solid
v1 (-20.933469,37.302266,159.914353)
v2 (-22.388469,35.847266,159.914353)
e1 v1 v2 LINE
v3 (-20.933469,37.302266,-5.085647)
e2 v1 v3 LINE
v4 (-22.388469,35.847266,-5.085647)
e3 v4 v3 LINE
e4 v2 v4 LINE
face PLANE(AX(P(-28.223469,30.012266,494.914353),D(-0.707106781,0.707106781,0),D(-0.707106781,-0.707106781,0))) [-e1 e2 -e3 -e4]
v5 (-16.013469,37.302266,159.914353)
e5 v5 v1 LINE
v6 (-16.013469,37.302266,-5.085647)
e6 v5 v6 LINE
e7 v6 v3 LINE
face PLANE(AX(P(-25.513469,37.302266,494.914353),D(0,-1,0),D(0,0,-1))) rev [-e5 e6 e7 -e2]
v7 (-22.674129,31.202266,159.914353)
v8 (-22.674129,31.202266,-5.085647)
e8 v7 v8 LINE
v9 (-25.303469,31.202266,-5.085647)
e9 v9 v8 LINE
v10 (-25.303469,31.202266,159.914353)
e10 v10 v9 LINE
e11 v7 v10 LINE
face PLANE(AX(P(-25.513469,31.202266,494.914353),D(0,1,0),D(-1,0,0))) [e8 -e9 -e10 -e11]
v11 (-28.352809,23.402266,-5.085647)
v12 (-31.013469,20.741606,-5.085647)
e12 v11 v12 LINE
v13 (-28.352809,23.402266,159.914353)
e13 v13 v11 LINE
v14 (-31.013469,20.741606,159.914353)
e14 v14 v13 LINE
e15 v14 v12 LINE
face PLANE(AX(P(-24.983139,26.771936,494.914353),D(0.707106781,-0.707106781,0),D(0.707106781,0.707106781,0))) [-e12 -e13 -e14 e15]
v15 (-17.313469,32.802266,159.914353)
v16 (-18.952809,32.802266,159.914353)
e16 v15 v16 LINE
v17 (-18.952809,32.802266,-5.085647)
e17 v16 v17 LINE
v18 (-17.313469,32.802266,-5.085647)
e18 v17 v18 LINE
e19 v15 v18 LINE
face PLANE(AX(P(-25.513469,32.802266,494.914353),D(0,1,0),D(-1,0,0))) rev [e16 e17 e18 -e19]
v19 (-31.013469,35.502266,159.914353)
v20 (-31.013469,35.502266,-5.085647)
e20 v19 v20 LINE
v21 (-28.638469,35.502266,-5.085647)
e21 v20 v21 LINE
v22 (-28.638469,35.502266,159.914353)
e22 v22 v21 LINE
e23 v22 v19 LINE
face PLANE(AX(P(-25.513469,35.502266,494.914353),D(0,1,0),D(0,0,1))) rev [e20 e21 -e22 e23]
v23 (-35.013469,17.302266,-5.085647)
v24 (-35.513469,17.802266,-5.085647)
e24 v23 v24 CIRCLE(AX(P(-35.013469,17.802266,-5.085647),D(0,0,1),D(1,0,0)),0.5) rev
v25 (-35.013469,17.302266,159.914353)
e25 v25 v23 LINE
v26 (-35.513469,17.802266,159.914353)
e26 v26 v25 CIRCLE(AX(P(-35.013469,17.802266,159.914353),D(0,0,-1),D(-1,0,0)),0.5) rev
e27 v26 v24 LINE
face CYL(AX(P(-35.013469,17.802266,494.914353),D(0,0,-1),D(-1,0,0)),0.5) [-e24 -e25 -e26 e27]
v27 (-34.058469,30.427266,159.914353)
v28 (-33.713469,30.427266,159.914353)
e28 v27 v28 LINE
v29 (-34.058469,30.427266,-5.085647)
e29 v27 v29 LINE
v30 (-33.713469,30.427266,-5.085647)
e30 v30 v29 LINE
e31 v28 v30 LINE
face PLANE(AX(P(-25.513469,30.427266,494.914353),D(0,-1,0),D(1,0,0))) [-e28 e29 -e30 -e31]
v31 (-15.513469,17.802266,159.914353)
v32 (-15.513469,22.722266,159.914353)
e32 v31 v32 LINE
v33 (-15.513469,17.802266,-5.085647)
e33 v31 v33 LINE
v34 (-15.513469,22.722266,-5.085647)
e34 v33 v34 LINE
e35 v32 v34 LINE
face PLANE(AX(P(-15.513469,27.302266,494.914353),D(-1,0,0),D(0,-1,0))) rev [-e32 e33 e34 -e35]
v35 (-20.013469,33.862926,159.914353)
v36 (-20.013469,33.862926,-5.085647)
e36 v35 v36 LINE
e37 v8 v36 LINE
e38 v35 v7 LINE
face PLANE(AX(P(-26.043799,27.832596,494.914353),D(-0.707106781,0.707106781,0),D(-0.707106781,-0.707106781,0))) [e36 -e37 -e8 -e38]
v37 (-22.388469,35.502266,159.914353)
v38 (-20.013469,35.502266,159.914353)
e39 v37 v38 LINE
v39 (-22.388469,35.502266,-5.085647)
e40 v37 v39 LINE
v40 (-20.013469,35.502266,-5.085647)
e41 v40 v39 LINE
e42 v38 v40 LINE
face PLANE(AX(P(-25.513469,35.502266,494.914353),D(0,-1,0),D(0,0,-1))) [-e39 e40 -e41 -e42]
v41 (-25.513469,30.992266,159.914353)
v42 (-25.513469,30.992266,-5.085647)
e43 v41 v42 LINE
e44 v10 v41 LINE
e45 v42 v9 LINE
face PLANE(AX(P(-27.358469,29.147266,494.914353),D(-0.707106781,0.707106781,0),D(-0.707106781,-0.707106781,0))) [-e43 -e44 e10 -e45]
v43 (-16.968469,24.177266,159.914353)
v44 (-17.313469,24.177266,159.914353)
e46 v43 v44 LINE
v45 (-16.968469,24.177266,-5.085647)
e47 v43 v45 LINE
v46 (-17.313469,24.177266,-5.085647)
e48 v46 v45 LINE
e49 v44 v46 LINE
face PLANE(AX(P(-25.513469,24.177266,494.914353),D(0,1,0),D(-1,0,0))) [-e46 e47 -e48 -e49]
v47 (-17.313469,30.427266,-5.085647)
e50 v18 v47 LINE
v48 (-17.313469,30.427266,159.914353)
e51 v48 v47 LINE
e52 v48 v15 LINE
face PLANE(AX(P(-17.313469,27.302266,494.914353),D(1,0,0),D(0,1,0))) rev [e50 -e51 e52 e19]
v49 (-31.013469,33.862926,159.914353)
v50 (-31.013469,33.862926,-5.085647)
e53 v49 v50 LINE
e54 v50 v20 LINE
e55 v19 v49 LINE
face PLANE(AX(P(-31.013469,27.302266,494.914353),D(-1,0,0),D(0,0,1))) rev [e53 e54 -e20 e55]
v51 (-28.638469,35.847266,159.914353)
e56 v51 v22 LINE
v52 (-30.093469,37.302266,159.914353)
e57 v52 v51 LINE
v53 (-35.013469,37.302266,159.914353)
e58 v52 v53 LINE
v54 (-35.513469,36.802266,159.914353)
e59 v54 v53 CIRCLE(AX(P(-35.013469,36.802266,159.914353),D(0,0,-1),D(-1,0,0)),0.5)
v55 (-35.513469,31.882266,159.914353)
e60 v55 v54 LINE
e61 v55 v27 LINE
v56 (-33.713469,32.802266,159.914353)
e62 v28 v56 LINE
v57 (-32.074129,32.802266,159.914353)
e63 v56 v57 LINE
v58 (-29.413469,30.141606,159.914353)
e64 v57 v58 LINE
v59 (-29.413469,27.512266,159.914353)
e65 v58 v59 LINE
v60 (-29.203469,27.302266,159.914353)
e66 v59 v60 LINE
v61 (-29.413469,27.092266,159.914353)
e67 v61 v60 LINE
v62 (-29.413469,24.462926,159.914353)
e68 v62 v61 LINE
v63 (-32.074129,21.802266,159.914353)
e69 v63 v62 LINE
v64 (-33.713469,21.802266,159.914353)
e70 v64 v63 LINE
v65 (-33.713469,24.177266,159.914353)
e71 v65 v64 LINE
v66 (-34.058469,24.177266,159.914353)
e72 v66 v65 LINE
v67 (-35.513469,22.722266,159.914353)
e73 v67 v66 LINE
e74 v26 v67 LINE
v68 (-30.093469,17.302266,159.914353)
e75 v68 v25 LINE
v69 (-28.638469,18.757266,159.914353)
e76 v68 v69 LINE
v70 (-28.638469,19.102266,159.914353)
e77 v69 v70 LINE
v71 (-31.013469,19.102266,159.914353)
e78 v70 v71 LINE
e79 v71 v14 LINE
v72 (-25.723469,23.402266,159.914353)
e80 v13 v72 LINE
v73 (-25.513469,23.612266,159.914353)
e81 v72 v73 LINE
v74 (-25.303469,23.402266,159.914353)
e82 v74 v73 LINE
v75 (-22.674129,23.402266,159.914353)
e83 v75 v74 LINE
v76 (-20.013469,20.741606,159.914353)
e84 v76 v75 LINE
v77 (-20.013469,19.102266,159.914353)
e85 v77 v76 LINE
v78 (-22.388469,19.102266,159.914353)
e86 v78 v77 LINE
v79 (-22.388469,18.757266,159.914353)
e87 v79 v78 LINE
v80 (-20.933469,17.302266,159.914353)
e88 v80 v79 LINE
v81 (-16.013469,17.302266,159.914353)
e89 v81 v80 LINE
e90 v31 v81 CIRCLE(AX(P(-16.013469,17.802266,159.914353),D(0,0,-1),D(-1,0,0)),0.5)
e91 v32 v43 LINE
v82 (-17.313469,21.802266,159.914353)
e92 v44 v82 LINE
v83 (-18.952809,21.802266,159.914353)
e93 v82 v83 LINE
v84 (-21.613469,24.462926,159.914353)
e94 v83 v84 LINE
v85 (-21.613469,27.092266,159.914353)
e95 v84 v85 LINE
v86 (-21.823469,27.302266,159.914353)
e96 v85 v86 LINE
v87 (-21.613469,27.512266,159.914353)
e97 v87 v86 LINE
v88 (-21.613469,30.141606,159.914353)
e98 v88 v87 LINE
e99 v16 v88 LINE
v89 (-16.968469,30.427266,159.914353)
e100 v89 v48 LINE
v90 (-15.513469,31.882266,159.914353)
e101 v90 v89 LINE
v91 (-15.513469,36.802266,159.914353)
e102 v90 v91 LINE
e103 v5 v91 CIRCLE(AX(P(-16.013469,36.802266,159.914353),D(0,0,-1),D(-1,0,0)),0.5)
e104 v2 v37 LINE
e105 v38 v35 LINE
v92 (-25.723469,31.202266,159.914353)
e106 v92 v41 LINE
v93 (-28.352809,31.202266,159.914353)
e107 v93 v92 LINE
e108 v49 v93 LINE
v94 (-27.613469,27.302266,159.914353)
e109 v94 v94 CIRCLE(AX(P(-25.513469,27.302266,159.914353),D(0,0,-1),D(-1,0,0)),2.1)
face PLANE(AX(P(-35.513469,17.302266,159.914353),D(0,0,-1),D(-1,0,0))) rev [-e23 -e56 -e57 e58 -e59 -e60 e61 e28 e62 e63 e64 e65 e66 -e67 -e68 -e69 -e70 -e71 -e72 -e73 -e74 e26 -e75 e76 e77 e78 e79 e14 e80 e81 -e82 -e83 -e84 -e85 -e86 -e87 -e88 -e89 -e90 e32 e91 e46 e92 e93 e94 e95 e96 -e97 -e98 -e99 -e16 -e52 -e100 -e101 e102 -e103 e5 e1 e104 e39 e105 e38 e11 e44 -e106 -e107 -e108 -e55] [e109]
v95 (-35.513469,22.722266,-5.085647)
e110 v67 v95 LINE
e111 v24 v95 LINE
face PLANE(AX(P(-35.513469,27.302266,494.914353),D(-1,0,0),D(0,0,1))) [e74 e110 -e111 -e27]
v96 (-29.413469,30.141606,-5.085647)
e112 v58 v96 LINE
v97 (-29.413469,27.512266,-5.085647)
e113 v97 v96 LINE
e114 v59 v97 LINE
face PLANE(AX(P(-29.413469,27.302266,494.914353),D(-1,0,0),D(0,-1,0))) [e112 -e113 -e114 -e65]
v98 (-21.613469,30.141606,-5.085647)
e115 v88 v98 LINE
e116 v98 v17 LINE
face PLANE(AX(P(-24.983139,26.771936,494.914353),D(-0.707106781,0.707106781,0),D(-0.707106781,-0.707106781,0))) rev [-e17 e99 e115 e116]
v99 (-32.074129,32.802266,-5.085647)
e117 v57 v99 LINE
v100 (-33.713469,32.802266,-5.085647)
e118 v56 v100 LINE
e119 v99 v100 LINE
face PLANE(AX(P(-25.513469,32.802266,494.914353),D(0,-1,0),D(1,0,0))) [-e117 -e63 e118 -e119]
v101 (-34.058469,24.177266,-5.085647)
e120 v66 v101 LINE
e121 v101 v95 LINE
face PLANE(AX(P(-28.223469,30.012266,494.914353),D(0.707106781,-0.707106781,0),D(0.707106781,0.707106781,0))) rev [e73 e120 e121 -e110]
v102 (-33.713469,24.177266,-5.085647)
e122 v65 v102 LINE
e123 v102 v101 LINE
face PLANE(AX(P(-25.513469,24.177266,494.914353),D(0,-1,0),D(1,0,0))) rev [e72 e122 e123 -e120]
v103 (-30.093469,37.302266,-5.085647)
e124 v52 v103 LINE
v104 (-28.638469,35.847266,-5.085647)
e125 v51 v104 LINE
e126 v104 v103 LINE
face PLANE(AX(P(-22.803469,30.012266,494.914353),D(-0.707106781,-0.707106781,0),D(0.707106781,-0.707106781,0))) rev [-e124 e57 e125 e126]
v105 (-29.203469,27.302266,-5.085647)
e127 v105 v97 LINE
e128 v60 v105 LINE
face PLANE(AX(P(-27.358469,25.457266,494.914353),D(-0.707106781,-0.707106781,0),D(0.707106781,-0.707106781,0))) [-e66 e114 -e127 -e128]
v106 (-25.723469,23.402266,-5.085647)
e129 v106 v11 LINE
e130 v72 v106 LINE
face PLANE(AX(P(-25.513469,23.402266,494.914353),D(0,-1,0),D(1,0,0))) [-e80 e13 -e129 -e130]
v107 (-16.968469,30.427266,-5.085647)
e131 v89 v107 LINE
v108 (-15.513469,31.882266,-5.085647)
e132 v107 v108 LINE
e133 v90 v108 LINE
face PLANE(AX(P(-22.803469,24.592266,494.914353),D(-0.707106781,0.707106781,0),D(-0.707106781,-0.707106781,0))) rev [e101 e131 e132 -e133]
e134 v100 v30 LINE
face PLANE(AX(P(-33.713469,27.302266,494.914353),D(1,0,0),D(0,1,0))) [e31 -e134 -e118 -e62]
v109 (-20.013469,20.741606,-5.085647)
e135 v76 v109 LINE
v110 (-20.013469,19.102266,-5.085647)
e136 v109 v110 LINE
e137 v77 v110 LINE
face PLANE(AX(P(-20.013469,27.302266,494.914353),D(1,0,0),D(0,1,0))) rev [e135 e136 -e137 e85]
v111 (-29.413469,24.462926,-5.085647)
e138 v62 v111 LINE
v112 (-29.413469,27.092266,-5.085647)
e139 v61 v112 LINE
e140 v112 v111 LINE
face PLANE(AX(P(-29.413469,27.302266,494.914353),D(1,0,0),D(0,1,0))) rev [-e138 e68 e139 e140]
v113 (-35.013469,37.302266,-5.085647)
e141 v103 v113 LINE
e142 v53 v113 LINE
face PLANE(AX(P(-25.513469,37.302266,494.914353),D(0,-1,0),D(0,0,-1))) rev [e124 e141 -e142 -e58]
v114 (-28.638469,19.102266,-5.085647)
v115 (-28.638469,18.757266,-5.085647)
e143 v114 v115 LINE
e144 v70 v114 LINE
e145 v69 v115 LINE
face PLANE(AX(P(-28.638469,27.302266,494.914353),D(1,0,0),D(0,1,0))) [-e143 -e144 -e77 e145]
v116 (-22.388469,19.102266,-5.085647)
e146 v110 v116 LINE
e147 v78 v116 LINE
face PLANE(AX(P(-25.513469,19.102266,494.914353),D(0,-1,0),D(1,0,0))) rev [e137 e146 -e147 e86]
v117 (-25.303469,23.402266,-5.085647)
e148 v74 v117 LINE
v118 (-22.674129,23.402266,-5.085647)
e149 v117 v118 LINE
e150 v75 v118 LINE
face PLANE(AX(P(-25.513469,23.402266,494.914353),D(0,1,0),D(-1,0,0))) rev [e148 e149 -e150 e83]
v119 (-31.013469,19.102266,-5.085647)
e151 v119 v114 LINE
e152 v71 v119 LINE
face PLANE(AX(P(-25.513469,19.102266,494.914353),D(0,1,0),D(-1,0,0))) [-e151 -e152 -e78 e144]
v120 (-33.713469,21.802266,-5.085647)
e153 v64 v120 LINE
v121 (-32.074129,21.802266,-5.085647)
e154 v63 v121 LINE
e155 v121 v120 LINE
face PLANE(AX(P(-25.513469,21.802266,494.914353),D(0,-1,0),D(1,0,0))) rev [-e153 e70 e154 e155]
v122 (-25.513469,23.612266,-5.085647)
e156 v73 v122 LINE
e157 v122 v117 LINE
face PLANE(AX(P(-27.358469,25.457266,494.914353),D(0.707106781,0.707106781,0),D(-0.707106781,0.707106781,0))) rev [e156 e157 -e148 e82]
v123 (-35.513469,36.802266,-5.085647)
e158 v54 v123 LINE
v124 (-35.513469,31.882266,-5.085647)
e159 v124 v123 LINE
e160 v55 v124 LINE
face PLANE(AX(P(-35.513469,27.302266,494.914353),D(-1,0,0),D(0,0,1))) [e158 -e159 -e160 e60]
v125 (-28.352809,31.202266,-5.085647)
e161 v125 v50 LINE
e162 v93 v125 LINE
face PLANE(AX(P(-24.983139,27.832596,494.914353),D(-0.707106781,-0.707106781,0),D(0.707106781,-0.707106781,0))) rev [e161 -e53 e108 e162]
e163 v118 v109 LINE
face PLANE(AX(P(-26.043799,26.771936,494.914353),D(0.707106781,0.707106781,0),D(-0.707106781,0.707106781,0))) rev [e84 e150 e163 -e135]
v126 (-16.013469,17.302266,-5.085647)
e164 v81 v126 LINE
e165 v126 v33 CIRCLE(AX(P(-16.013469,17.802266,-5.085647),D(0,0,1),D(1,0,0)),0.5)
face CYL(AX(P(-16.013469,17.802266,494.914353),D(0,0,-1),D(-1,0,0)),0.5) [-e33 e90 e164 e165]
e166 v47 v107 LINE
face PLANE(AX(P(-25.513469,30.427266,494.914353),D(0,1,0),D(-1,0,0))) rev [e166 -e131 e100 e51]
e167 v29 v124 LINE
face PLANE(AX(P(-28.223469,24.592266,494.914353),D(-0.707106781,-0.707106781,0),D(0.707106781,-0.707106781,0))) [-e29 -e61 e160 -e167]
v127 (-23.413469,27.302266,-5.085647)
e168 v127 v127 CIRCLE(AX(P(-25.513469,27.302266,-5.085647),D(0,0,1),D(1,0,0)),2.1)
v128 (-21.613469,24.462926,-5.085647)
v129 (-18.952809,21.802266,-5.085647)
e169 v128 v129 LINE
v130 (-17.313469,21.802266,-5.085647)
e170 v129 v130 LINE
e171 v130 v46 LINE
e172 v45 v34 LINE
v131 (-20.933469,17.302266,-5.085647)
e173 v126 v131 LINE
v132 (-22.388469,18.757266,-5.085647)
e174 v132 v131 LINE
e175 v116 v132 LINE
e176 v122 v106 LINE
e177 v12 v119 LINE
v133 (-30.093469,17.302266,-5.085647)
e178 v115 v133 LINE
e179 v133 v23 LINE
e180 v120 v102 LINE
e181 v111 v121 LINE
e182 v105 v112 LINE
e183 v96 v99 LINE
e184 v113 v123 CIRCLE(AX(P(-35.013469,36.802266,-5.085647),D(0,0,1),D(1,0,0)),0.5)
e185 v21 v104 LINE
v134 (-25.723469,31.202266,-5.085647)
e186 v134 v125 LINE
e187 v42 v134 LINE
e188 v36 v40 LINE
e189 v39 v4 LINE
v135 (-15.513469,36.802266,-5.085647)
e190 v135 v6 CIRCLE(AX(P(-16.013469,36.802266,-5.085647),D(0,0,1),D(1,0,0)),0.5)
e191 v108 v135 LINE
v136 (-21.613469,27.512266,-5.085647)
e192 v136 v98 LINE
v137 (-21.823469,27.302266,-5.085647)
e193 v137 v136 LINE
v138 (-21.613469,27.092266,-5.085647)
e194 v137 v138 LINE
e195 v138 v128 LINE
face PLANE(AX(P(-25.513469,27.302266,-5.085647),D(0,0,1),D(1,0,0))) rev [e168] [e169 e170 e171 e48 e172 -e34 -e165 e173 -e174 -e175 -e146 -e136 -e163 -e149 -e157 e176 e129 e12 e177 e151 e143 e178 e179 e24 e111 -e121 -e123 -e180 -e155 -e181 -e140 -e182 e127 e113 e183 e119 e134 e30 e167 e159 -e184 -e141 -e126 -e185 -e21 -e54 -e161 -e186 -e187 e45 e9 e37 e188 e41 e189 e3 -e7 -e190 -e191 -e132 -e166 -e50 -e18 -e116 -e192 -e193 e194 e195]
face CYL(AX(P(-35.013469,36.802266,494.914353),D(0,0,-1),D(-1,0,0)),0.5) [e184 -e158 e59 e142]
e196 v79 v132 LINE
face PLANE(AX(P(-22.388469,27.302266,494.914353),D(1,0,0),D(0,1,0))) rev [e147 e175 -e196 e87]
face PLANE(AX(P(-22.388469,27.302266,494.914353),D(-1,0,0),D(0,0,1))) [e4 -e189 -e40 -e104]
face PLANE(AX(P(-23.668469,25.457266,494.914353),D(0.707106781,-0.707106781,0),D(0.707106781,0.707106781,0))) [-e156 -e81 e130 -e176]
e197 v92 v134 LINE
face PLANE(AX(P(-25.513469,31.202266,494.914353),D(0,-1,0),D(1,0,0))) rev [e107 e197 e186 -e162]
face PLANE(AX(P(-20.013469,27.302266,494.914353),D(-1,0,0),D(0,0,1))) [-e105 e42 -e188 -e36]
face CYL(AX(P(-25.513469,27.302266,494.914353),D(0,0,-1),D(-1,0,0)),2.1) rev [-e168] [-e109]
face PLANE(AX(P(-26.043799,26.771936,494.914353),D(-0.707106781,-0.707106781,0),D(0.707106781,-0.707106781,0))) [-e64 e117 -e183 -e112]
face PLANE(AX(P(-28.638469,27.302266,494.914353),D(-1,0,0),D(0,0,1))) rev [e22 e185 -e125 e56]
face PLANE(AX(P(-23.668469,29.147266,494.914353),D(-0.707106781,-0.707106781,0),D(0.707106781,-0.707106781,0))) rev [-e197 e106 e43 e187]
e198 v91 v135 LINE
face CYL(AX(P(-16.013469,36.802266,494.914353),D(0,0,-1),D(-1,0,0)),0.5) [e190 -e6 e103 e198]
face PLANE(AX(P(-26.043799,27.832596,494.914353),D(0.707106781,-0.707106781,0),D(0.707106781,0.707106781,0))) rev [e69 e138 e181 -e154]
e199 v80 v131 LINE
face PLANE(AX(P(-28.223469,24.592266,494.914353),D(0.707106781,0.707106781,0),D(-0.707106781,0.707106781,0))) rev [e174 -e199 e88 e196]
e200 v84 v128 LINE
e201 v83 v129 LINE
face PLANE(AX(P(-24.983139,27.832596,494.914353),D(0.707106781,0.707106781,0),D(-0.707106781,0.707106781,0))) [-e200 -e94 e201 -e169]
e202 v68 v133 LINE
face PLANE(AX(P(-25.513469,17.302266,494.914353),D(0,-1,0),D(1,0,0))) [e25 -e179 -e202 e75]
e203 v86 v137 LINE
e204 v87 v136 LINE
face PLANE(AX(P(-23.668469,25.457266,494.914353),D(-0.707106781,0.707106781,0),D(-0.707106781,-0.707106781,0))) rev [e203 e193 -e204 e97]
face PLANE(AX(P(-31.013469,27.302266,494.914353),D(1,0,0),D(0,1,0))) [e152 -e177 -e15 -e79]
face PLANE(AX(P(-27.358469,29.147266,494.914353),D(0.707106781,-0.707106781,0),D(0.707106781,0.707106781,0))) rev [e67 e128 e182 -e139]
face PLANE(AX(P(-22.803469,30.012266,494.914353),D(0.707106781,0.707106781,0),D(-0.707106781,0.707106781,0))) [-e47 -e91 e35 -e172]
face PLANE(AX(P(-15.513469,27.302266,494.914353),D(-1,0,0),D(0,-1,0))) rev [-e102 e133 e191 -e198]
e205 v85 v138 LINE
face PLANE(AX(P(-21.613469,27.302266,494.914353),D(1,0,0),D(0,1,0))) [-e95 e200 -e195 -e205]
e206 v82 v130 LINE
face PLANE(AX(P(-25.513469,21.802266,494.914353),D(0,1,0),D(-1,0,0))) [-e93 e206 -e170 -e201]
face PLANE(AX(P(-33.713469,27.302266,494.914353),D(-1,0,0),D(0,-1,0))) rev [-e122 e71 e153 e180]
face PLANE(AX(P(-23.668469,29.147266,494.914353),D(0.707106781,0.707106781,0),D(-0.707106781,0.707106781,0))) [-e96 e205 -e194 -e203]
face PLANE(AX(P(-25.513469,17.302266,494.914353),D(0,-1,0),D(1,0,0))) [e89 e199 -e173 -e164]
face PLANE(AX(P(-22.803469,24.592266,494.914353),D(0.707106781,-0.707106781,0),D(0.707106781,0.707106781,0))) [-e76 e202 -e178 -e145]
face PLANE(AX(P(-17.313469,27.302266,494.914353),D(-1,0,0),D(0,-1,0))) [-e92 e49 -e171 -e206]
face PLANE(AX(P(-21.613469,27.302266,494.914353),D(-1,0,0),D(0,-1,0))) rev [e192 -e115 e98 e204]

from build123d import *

# Parameters (mm, degrees)
V_SLOT_START                           = -5.085646751
V_SLOT_20X20X500_LINEAR_RAIL_OUTLINE_R = 2.1
V_SLOT_20X20X500_LINEAR_RAIL_DEPTH     = 500
SKETCH1_W                              = 20
SKETCH1_H                              = 335
CUT_EXTRUDE1_DEPTH                     = 497.589794047


# Read off the part's stored shape, not the designer's step: V-Slot 20x20x500 Linear Rail
with BuildPart() as part:
    # V-Slot 20x20x500 Linear Rail outline → V-Slot 20x20x500 Linear Rail (new body)
    with BuildSketch(Plane.XY.offset(V_SLOT_START)):
        with BuildLine():
            Line((-21.613469268, 24.462926439), (-21.613469268, 27.092266268))
            Line((-21.613469268, 27.092266268), (-21.823469268, 27.302266268))
            Line((-21.823469268, 27.302266268), (-21.613469268, 27.512266268))
            Line((-21.613469268, 27.512266268), (-21.613469268, 30.141606096))
            Line((-21.613469268, 30.141606096), (-18.952809096, 32.802266268))
            Line((-18.952809096, 32.802266268), (-17.313469268, 32.802266268))
            Line((-17.313469268, 32.802266268), (-17.313469268, 30.427266268))
            Line((-17.313469268, 30.427266268), (-16.968469268, 30.427266268))
            Line((-16.968469268, 30.427266268), (-15.513469268, 31.882266268))
            Line((-15.513469268, 31.882266268), (-15.513469268, 36.802266268))
            ThreePointArc((-15.513469268, 36.802266268), (-15.659915878, 37.155819658), (-16.013469268, 37.302266268))
            Line((-16.013469268, 37.302266268), (-20.933469268, 37.302266268))
            Line((-20.933469268, 37.302266268), (-22.388469268, 35.847266268))
            Line((-22.388469268, 35.847266268), (-22.388469268, 35.502266268))
            Line((-22.388469268, 35.502266268), (-20.013469268, 35.502266268))
            Line((-20.013469268, 35.502266268), (-20.013469268, 33.862926439))
            Line((-20.013469268, 33.862926439), (-22.67412944, 31.202266268))
            Line((-22.67412944, 31.202266268), (-25.303469268, 31.202266268))
            Line((-25.303469268, 31.202266268), (-25.513469268, 30.992266268))
            Line((-25.513469268, 30.992266268), (-25.723469268, 31.202266268))
            Line((-25.723469268, 31.202266268), (-28.352809096, 31.202266268))
            Line((-28.352809096, 31.202266268), (-31.013469268, 33.862926439))
            Line((-31.013469268, 33.862926439), (-31.013469268, 35.502266268))
            Line((-31.013469268, 35.502266268), (-28.638469268, 35.502266268))
            Line((-28.638469268, 35.502266268), (-28.638469268, 35.847266268))
            Line((-28.638469268, 35.847266268), (-30.093469268, 37.302266268))
            Line((-30.093469268, 37.302266268), (-35.013469268, 37.302266268))
            ThreePointArc((-35.013469268, 37.302266268), (-35.367022659, 37.155819658), (-35.513469268, 36.802266268))
            Line((-35.513469268, 36.802266268), (-35.513469268, 31.882266268))
            Line((-35.513469268, 31.882266268), (-34.058469268, 30.427266268))
            Line((-34.058469268, 30.427266268), (-33.713469268, 30.427266268))
            Line((-33.713469268, 30.427266268), (-33.713469268, 32.802266268))
            Line((-33.713469268, 32.802266268), (-32.07412944, 32.802266268))
            Line((-32.07412944, 32.802266268), (-29.413469268, 30.141606096))
            Line((-29.413469268, 30.141606096), (-29.413469268, 27.512266268))
            Line((-29.413469268, 27.512266268), (-29.203469268, 27.302266268))
            Line((-29.203469268, 27.302266268), (-29.413469268, 27.092266268))
            Line((-29.413469268, 27.092266268), (-29.413469268, 24.462926439))
            Line((-29.413469268, 24.462926439), (-32.07412944, 21.802266268))
            Line((-32.07412944, 21.802266268), (-33.713469268, 21.802266268))
            Line((-33.713469268, 21.802266268), (-33.713469268, 24.177266268))
            Line((-33.713469268, 24.177266268), (-34.058469268, 24.177266268))
            Line((-34.058469268, 24.177266268), (-35.513469268, 22.722266268))
            Line((-35.513469268, 22.722266268), (-35.513469268, 17.802266268))
            ThreePointArc((-35.513469268, 17.802266268), (-35.367022659, 17.448712877), (-35.013469268, 17.302266268))
            Line((-35.013469268, 17.302266268), (-30.093469268, 17.302266268))
            Line((-30.093469268, 17.302266268), (-28.638469268, 18.757266268))
            Line((-28.638469268, 18.757266268), (-28.638469268, 19.102266268))
            Line((-28.638469268, 19.102266268), (-31.013469268, 19.102266268))
            Line((-31.013469268, 19.102266268), (-31.013469268, 20.741606096))
            Line((-31.013469268, 20.741606096), (-28.352809096, 23.402266268))
            Line((-28.352809096, 23.402266268), (-25.723469268, 23.402266268))
            Line((-25.723469268, 23.402266268), (-25.513469268, 23.612266268))
            Line((-25.513469268, 23.612266268), (-25.303469268, 23.402266268))
            Line((-25.303469268, 23.402266268), (-22.67412944, 23.402266268))
            Line((-22.67412944, 23.402266268), (-20.013469268, 20.741606096))
            Line((-20.013469268, 20.741606096), (-20.013469268, 19.102266268))
            Line((-20.013469268, 19.102266268), (-22.388469268, 19.102266268))
            Line((-22.388469268, 19.102266268), (-22.388469268, 18.757266268))
            Line((-22.388469268, 18.757266268), (-20.933469268, 17.302266268))
            Line((-20.933469268, 17.302266268), (-16.013469268, 17.302266268))
            ThreePointArc((-16.013469268, 17.302266268), (-15.659915877, 17.448712878), (-15.513469268, 17.802266268))
            Line((-15.513469268, 17.802266268), (-15.513469268, 22.722266268))
            Line((-15.513469268, 22.722266268), (-16.968469268, 24.177266268))
            Line((-16.968469268, 24.177266268), (-17.313469268, 24.177266268))
            Line((-17.313469268, 24.177266268), (-17.313469268, 21.802266268))
            Line((-17.313469268, 21.802266268), (-18.952809096, 21.802266268))
            Line((-18.952809096, 21.802266268), (-21.613469268, 24.462926439))
        make_face()
        with Locations((-25.513469268, 27.302266268)):
            Circle(V_SLOT_20X20X500_LINEAR_RAIL_OUTLINE_R, mode=Mode.SUBTRACT)
    extrude(amount=V_SLOT_20X20X500_LINEAR_RAIL_DEPTH)

    # Sketch1 → Cut-Extrude1 (cut, through all)
    with BuildSketch(Plane(origin=(0, 37.302266268, 0), x_dir=(1, 0, 0), z_dir=(0, 1, 0))):
        with Locations((-25.513469268, -327.414353249)):
            Rectangle(SKETCH1_W, SKETCH1_H)
    extrude(amount=-CUT_EXTRUDE1_DEPTH, mode=Mode.SUBTRACT)


solid = part.part
